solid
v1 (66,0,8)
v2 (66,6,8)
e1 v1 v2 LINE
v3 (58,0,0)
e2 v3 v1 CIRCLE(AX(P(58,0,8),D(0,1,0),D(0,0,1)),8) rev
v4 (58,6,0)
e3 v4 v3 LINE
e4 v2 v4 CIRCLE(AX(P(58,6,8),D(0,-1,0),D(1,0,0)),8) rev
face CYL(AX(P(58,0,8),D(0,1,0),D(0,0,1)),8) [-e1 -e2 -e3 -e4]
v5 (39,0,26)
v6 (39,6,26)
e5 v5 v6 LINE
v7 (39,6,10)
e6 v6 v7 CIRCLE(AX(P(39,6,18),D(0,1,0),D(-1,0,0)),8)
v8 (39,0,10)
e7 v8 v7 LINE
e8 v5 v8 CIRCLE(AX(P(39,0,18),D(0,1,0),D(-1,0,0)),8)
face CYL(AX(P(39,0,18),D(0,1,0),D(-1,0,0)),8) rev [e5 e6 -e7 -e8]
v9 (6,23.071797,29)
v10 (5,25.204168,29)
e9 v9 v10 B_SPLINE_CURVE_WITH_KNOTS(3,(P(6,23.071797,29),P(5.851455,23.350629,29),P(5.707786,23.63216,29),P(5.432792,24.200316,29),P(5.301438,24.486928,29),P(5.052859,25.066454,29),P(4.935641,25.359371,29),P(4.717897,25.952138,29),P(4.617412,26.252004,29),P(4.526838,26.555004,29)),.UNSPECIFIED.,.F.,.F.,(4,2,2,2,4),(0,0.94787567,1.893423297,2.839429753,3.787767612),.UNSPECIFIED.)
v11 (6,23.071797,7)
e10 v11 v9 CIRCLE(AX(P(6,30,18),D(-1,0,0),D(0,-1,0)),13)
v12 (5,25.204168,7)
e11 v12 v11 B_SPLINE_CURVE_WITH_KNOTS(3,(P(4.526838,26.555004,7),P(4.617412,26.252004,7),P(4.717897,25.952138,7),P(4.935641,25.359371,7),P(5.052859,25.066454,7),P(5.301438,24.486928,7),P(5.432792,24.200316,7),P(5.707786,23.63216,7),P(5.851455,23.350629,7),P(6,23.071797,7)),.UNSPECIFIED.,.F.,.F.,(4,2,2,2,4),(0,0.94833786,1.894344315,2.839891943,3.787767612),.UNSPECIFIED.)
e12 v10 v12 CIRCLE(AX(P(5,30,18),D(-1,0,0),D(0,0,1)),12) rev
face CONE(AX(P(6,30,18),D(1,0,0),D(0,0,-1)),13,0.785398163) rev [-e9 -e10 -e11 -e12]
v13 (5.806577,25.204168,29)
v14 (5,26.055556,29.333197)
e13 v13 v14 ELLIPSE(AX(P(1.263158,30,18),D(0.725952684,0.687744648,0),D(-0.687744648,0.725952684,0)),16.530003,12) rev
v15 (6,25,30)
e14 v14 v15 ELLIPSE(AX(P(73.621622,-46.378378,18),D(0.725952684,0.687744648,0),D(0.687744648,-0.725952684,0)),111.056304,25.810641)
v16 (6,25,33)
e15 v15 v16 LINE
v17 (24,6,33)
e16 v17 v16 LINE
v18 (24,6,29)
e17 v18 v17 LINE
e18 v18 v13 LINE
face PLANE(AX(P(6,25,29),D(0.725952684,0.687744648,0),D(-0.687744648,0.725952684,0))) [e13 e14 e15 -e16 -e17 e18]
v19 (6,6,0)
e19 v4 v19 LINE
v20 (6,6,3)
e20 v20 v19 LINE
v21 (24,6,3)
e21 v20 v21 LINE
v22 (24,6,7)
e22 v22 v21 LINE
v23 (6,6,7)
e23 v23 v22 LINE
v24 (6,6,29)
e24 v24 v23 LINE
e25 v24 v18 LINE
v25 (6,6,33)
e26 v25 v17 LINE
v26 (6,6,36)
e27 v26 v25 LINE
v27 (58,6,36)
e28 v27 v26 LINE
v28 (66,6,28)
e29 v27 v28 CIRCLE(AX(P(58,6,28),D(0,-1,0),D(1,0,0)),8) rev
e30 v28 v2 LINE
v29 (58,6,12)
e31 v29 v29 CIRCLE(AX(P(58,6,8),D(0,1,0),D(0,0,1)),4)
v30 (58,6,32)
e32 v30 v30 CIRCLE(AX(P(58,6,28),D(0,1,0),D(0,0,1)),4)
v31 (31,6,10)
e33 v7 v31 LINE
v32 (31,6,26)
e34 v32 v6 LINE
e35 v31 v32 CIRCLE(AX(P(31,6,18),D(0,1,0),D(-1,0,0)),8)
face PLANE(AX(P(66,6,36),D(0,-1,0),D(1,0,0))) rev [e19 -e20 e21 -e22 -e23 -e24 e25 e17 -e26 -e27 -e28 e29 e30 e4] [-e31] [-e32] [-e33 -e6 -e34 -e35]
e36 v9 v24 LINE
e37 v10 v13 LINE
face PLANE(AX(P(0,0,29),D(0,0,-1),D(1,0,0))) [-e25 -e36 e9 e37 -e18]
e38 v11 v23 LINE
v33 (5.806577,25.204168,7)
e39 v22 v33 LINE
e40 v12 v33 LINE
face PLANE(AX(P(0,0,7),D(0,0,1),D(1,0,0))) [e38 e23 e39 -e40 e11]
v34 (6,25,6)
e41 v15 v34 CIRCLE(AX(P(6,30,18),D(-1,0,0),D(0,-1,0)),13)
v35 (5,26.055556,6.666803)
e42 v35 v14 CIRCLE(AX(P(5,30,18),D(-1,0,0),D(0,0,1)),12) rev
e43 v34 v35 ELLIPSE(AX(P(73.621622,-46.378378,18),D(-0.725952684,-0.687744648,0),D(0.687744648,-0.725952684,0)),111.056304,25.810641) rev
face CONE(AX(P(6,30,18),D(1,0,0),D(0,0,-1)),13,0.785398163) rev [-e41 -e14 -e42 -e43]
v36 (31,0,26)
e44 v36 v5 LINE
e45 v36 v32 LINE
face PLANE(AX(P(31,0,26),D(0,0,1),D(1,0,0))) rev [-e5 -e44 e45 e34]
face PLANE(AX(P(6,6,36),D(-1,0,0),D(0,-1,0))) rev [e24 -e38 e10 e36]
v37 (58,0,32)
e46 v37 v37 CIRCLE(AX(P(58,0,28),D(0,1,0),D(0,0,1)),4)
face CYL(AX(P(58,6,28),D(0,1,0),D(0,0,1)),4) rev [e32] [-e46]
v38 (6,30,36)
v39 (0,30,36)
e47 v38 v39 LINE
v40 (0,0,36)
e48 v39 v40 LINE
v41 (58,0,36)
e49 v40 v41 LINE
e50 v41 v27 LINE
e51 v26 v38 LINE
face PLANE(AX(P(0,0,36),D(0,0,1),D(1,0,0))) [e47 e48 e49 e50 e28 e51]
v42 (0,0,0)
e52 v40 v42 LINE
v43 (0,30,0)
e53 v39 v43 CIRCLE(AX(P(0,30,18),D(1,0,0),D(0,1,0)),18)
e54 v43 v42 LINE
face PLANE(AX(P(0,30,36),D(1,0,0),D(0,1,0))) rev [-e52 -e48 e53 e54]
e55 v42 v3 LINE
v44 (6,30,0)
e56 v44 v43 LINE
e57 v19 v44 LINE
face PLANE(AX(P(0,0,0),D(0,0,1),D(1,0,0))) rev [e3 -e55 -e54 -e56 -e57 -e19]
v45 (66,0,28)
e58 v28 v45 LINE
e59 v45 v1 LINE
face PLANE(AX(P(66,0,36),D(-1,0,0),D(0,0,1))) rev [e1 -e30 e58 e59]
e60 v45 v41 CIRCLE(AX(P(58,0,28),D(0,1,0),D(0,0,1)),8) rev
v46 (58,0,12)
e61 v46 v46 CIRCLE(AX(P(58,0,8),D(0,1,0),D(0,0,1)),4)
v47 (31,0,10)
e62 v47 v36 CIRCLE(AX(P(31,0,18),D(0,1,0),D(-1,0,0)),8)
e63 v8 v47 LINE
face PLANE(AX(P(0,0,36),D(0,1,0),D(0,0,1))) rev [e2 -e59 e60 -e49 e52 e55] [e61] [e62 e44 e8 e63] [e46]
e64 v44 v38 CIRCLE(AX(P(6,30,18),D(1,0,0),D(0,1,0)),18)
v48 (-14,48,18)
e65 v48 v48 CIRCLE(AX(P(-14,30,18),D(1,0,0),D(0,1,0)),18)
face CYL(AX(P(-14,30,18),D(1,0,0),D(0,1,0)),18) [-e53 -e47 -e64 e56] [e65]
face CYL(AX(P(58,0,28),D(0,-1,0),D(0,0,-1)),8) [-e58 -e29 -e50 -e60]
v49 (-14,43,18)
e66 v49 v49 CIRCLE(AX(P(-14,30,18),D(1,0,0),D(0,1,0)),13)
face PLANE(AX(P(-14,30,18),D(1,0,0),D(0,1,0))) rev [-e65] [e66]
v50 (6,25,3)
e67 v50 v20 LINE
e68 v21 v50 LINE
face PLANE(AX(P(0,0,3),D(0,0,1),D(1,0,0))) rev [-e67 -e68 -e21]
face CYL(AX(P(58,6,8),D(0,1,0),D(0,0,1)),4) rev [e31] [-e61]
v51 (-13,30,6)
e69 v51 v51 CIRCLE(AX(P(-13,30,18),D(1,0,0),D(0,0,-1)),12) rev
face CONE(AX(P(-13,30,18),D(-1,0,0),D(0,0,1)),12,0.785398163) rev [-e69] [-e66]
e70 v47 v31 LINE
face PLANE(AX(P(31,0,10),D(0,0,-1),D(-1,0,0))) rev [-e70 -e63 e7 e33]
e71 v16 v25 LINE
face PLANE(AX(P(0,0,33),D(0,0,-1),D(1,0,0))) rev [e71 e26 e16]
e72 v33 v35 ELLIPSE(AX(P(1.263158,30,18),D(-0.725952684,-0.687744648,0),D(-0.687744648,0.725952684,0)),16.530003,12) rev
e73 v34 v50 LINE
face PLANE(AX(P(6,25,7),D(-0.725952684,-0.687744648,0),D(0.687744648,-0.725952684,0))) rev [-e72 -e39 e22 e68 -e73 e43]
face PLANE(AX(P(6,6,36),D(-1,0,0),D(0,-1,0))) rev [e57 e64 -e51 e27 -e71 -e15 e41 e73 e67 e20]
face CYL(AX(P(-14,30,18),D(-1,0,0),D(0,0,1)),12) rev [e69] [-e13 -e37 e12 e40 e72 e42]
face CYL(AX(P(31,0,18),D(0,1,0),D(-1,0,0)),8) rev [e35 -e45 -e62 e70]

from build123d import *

# Parameters (mm, degrees)
BOSS_EXTRUDE1_DEPTH = 36
SKETCH2_R           = 18
BOSS_EXTRUDE2_DEPTH = 20
BOSS_EXTRUDE3_START = 3
BOSS_EXTRUDE3_DEPTH = 4
HOLE1_D             = 24
CHAMFER1_SIZE       = 1
CUT_EXTRUDE1_DEPTH  = 87.116200566
FILLET1_R           = 8
HOLE2_D             = 8


with BuildPart() as part:
    # Sketch1 → Boss-Extrude1 (new body)
    with BuildSketch(Plane.XY):
        Polygon((0, 30), (0, 0), (66, 0), (66, 6), (6, 6), (6, 30), align=None)
    extrude(amount=BOSS_EXTRUDE1_DEPTH)

    # Sketch2 → Boss-Extrude2 (add)
    with BuildSketch(Plane(origin=(6, 0, 0), x_dir=(0, 0, -1), z_dir=(1, 0, 0))):
        with Locations(Location((-18, 30, 0), (0, 0, 90))):
            Circle(SKETCH2_R)
    extrude(amount=-BOSS_EXTRUDE2_DEPTH)

    # Sketch3 → Boss-Extrude3 (add)
    with BuildSketch(Plane.XY.offset(BOSS_EXTRUDE3_START)):
        Polygon((6, 25), (24, 6), (6, 6), align=None)
    boss_extrude3 = extrude(amount=BOSS_EXTRUDE3_DEPTH)

    # Mirror1: Boss-Extrude3 across plane
    add(boss_extrude3.mirror(Plane.XY.offset(18)))

    # Hole1 (through all)
    with Locations(Plane.ZY.offset(14)):
        with Locations((18, 30)):
            Hole(HOLE1_D / 2)

    # Chamfer1
    # the kernel refuses this chamfer: 1 mm, written as the material it takes off along each edge
    with BuildSketch(Plane(origin=(-14, 30, 18), x_dir=(0, 0, -1), z_dir=(0, -1, 0))) as chamfer1_piece_1:
        Polygon((12, CHAMFER1_SIZE), (12 + CHAMFER1_SIZE, 0), (12, 0), align=None)
    revolve(axis=Axis((-14, 30, 18), (1, 0, 0)), mode=Mode.SUBTRACT)
    with BuildSketch(Plane(origin=(6, 30, 18), x_dir=(0, 0, -1), z_dir=(0, -1, 0))) as chamfer1_piece_2_section:
        Polygon((12 + CHAMFER1_SIZE, 0), (12, -CHAMFER1_SIZE), (12, 0), align=None)
    chamfer1_piece_2 = revolve(axis=Axis((6, 30, 18), (1, 0, 0)), mode=Mode.PRIVATE)
    chamfer1_piece_2 = split(chamfer1_piece_2, bisect_by=Plane(origin=(1.543769163, 29.703799217, 6.002209696), z_dir=(0.7259526839058266, 0.6877446479107833, 0)), keep=Keep.TOP, mode=Mode.PRIVATE)
    add(chamfer1_piece_2, mode=Mode.SUBTRACT)
    with BuildSketch(Plane(origin=(6, 30, 18), x_dir=(0, 0, -1), z_dir=(0, -1, 0))) as chamfer1_piece_3_section:
        Polygon((12 + CHAMFER1_SIZE, 0), (12, -CHAMFER1_SIZE), (12, 0), align=None)
    chamfer1_piece_3 = revolve(axis=Axis((6, 30, 18), (1, 0, 0)), mode=Mode.PRIVATE)
    chamfer1_piece_3 = split(chamfer1_piece_3, bisect_by=Plane(origin=(5.516878747, 17.516878747, 7), z_dir=(0, 0, 1)), keep=Keep.TOP, mode=Mode.PRIVATE)
    chamfer1_piece_3 = split(chamfer1_piece_3, bisect_by=Plane(origin=(5.516878747, 17.516878747, 29), z_dir=(0, 0, -1)), keep=Keep.TOP, mode=Mode.PRIVATE)
    add(chamfer1_piece_3, mode=Mode.SUBTRACT)

    # Sketch7 → Cut-Extrude1 (cut, through all)
    with BuildSketch(Plane(origin=(0, 6, 0), x_dir=(1, 0, 0), z_dir=(0, 1, 0))):
        with BuildLine():
            Line((31, -10), (39, -10))
            ThreePointArc((39, -10), (47, -18), (39, -26))
            Line((39, -26), (31, -26))
            ThreePointArc((31, -26), (23, -18), (31, -10))
        make_face()
    extrude(amount=-CUT_EXTRUDE1_DEPTH, mode=Mode.SUBTRACT)

    # Fillet1
    fillet1_edges = [part.edges().sort_by_distance(p)[0] for p in [
        (66, 3, 36),
        (66, 3, 0),
    ]]
    fillet(fillet1_edges, radius=FILLET1_R)

    # Hole2 (through all)
    with Locations(Plane(origin=(0, 6, 0), x_dir=(1, 0, 0), z_dir=(0, 1, 0))):
        with Locations((58, -8), (58, -28)):
            Hole(HOLE2_D / 2)


solid = part.part
